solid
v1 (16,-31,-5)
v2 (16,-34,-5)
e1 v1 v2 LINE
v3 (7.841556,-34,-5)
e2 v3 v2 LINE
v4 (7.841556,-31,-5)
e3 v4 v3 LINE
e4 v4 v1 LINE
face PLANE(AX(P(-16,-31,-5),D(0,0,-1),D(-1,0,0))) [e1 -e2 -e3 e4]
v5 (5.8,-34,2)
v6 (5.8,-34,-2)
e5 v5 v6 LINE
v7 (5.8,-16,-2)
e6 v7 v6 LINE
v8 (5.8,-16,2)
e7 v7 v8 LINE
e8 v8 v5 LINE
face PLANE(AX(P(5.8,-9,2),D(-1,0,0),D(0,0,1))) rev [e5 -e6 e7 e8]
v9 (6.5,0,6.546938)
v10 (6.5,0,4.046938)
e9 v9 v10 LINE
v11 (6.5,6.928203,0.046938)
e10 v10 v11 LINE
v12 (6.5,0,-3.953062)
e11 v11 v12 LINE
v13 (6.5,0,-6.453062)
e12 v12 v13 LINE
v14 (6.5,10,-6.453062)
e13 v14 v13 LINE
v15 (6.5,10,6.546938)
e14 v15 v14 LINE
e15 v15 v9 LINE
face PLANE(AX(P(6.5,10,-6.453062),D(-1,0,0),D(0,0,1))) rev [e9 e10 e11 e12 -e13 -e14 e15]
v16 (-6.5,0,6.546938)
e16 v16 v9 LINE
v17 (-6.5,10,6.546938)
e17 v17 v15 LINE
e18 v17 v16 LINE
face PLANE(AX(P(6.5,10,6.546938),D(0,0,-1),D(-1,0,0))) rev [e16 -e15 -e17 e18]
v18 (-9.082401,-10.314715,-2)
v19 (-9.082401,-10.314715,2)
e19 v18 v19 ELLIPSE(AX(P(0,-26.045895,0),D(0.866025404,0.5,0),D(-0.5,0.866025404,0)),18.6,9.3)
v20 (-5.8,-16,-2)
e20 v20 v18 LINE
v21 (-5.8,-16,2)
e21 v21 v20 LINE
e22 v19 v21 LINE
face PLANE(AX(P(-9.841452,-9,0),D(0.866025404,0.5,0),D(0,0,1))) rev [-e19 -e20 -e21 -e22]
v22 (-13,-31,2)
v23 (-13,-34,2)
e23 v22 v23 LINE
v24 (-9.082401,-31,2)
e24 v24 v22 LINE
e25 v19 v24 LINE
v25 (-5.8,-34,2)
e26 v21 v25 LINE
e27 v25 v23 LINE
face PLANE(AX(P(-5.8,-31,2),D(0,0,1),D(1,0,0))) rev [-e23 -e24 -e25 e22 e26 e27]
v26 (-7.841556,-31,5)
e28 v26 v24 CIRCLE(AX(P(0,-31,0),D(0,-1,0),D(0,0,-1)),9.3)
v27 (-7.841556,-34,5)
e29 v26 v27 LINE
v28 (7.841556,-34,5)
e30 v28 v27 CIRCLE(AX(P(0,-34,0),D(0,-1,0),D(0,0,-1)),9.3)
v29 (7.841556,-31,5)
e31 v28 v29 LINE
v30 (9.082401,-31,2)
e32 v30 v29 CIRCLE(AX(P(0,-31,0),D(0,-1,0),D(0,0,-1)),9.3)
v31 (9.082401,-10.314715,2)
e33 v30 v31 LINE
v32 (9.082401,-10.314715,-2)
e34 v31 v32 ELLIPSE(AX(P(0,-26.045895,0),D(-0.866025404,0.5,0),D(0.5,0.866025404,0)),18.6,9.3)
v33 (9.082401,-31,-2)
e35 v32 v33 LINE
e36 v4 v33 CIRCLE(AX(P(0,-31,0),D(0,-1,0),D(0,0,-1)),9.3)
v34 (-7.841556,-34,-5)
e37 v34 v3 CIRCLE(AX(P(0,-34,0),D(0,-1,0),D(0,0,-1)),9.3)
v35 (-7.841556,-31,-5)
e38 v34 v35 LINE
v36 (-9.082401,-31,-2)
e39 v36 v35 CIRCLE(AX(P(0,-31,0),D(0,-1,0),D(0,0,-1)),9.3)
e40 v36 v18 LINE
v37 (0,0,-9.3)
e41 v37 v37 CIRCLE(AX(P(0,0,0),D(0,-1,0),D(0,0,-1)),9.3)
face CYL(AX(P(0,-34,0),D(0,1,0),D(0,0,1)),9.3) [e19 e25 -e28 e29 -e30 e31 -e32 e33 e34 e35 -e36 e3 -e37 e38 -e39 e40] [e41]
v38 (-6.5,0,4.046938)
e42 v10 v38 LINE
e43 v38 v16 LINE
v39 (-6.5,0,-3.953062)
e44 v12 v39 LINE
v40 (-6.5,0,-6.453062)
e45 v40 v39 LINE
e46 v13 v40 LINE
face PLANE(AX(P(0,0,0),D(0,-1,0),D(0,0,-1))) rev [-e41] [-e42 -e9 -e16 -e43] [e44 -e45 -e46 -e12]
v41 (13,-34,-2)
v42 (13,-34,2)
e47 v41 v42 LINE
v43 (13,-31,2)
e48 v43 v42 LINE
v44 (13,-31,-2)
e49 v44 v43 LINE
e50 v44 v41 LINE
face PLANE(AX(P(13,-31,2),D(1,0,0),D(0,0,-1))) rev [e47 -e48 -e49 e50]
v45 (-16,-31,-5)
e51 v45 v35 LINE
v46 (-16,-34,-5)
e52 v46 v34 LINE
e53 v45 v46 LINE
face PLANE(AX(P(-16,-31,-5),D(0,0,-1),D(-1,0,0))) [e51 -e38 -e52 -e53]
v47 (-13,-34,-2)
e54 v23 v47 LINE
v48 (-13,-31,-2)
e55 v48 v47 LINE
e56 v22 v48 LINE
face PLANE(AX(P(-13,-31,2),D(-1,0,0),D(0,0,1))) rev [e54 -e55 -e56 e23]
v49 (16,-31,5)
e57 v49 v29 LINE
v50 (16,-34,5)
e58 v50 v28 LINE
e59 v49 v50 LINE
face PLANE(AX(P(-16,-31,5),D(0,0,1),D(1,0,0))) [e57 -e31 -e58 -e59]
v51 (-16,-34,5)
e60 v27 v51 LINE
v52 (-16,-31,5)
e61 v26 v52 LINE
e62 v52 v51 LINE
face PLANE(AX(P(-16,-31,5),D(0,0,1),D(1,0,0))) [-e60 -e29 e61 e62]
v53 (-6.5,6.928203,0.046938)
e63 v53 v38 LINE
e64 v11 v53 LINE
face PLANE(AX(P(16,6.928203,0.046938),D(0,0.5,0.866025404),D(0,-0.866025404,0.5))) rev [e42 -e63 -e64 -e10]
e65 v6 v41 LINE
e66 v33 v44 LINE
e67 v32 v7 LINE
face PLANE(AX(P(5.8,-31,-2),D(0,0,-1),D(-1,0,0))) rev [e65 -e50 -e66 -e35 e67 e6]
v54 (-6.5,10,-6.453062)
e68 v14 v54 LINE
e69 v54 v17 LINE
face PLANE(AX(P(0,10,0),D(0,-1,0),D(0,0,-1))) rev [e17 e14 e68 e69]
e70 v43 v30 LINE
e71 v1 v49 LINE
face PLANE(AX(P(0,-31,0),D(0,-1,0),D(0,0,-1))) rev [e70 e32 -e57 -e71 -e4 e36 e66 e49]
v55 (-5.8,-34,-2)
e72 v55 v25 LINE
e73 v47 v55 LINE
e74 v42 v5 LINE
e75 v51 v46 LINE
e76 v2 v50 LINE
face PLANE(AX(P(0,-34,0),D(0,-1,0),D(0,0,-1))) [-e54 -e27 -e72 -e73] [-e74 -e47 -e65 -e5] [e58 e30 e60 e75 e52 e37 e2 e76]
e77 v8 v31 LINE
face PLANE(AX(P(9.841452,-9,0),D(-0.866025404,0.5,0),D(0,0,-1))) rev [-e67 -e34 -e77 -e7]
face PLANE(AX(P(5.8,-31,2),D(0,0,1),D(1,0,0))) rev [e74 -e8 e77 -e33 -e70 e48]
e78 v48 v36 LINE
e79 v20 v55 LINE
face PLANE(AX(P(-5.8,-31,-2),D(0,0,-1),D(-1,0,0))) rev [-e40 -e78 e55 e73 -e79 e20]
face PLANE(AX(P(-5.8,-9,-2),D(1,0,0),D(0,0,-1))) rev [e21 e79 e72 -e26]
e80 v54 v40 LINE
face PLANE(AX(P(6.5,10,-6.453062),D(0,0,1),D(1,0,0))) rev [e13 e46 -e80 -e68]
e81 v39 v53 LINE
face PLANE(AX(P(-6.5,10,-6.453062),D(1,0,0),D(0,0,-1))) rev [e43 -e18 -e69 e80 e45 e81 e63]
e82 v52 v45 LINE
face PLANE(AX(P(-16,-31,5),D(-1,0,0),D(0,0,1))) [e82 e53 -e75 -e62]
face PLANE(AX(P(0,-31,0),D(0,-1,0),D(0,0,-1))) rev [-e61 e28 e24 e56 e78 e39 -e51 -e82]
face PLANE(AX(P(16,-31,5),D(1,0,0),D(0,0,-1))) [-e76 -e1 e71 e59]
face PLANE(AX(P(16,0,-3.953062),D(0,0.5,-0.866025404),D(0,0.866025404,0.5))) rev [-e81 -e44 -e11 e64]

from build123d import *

# Parameters (mm, degrees)
SKETCH1_W               = 13
SKETCH1_H               = 13
BOSS_EXTRUDE1_DEPTH     = 10
SKETCH2_R               = 9.3
BOSS_EXTRUDE2_DEPTH     = 34
SKETCH3_W               = 32
SKETCH3_H               = 10
SKETCH3_W_2             = 7.2
SKETCH3_H_2             = 4
BOSS_EXTRUDE3_DEPTH     = 3
CUT_EXTRUDE1_DEPTH      = 42.817938734
CUT_EXTRUDE1_DEPTH_BACK = 42.817938734
SKETCH5_W               = 7.2
SKETCH5_H               = 4
CUT_EXTRUDE2_DEPTH      = 25
CHAMFER1_SIZE           = 7
CHAMFER1_SIZE_2         = 4.041451884


with BuildPart() as part:
    # Sketch1 → Boss-Extrude1 (new body)
    with BuildSketch(Plane(origin=(0, 0, 0), x_dir=(1, 0, 0), z_dir=(0, 1, 0))):
        with Locations((0, -0.046937875)):
            Rectangle(SKETCH1_W, SKETCH1_H)
    extrude(amount=BOSS_EXTRUDE1_DEPTH)

    # Sketch2 → Boss-Extrude2 (add)
    with BuildSketch(Plane.XZ):
        with Locations(Location((0, 0, 0), (0, 0, 270))):
            Circle(SKETCH2_R)
    extrude(amount=BOSS_EXTRUDE2_DEPTH)

    # Sketch3 → Boss-Extrude3 (add)
    with BuildSketch(Plane.XZ.offset(34)):
        Rectangle(SKETCH3_W, SKETCH3_H)
        with Locations((-9.4, 0)):
            Rectangle(SKETCH3_W_2, SKETCH3_H_2, mode=Mode.SUBTRACT)
        with Locations((9.4, 0)):
            Rectangle(SKETCH3_W_2, SKETCH3_H_2, mode=Mode.SUBTRACT)
    extrude(amount=-BOSS_EXTRUDE3_DEPTH)

    # Sketch4 → Cut-Extrude1 (cut, two sides: drawn at the far end of the back side and taken through both)
    with BuildSketch(Plane.ZY.offset(6.5).offset(-CUT_EXTRUDE1_DEPTH_BACK)):
        Polygon((-3.953062125, 0), (4.046937875, 0), (0.046937875, 6.92820323), align=None)
    extrude(amount=CUT_EXTRUDE1_DEPTH + CUT_EXTRUDE1_DEPTH_BACK, mode=Mode.SUBTRACT)

    # Sketch5 → Cut-Extrude2 (cut)
    with BuildSketch(Plane.XZ.offset(34)):
        with Locations((-9.4, 0)):
            Rectangle(SKETCH5_W, SKETCH5_H)
        with Locations((9.4, 0)):
            Rectangle(SKETCH5_W, SKETCH5_H)
    extrude(amount=-CUT_EXTRUDE2_DEPTH, mode=Mode.SUBTRACT)

    # Chamfer1
    # the kernel refuses this chamfer: 7, 4.041451884 mm, written as the material it adds along each edge
    with BuildSketch(Plane(origin=(-5.8, -9, -20.109600283), x_dir=(0.01932676561270078, -0.9998132206222078, 0), z_dir=(0, 0, 1))) as chamfer1_piece_1_section:
        Polygon((CHAMFER1_SIZE * 0.999813220622, -CHAMFER1_SIZE * 0.0193267656127), (-CHAMFER1_SIZE_2 * 0.0193267656143, -CHAMFER1_SIZE_2 * 0.999813220703), (0, 0), align=None)
    chamfer1_piece_1 = extrude(amount=40.219200565, mode=Mode.PRIVATE)
    chamfer1_piece_1 = chamfer1_piece_1 & Plane(origin=(0, -11.718976522, 0), x_dir=(0, 0, -1), z_dir=(0, 1, 0)) * Cylinder(9.3, 109, mode=Mode.PRIVATE)
    add(chamfer1_piece_1)
    with BuildSketch(Plane(origin=(5.8, -9, 20.109600283), x_dir=(-0.01932676561270078, -0.9998132206222078, 0), z_dir=(0, 0, -1))) as chamfer1_piece_2_section:
        Polygon((CHAMFER1_SIZE * 0.999813220622, -CHAMFER1_SIZE * 0.0193267656127), (-CHAMFER1_SIZE_2 * 0.0193267656143, -CHAMFER1_SIZE_2 * 0.999813220703), (0, 0), align=None)
    chamfer1_piece_2 = extrude(amount=40.219200565, mode=Mode.PRIVATE)
    chamfer1_piece_2 = chamfer1_piece_2 & Plane(origin=(0, -11.718976523, 0), x_dir=(0, 0, -1), z_dir=(0, 1, 0)) * Cylinder(9.3, 109, mode=Mode.PRIVATE)
    add(chamfer1_piece_2)


solid = part.part
